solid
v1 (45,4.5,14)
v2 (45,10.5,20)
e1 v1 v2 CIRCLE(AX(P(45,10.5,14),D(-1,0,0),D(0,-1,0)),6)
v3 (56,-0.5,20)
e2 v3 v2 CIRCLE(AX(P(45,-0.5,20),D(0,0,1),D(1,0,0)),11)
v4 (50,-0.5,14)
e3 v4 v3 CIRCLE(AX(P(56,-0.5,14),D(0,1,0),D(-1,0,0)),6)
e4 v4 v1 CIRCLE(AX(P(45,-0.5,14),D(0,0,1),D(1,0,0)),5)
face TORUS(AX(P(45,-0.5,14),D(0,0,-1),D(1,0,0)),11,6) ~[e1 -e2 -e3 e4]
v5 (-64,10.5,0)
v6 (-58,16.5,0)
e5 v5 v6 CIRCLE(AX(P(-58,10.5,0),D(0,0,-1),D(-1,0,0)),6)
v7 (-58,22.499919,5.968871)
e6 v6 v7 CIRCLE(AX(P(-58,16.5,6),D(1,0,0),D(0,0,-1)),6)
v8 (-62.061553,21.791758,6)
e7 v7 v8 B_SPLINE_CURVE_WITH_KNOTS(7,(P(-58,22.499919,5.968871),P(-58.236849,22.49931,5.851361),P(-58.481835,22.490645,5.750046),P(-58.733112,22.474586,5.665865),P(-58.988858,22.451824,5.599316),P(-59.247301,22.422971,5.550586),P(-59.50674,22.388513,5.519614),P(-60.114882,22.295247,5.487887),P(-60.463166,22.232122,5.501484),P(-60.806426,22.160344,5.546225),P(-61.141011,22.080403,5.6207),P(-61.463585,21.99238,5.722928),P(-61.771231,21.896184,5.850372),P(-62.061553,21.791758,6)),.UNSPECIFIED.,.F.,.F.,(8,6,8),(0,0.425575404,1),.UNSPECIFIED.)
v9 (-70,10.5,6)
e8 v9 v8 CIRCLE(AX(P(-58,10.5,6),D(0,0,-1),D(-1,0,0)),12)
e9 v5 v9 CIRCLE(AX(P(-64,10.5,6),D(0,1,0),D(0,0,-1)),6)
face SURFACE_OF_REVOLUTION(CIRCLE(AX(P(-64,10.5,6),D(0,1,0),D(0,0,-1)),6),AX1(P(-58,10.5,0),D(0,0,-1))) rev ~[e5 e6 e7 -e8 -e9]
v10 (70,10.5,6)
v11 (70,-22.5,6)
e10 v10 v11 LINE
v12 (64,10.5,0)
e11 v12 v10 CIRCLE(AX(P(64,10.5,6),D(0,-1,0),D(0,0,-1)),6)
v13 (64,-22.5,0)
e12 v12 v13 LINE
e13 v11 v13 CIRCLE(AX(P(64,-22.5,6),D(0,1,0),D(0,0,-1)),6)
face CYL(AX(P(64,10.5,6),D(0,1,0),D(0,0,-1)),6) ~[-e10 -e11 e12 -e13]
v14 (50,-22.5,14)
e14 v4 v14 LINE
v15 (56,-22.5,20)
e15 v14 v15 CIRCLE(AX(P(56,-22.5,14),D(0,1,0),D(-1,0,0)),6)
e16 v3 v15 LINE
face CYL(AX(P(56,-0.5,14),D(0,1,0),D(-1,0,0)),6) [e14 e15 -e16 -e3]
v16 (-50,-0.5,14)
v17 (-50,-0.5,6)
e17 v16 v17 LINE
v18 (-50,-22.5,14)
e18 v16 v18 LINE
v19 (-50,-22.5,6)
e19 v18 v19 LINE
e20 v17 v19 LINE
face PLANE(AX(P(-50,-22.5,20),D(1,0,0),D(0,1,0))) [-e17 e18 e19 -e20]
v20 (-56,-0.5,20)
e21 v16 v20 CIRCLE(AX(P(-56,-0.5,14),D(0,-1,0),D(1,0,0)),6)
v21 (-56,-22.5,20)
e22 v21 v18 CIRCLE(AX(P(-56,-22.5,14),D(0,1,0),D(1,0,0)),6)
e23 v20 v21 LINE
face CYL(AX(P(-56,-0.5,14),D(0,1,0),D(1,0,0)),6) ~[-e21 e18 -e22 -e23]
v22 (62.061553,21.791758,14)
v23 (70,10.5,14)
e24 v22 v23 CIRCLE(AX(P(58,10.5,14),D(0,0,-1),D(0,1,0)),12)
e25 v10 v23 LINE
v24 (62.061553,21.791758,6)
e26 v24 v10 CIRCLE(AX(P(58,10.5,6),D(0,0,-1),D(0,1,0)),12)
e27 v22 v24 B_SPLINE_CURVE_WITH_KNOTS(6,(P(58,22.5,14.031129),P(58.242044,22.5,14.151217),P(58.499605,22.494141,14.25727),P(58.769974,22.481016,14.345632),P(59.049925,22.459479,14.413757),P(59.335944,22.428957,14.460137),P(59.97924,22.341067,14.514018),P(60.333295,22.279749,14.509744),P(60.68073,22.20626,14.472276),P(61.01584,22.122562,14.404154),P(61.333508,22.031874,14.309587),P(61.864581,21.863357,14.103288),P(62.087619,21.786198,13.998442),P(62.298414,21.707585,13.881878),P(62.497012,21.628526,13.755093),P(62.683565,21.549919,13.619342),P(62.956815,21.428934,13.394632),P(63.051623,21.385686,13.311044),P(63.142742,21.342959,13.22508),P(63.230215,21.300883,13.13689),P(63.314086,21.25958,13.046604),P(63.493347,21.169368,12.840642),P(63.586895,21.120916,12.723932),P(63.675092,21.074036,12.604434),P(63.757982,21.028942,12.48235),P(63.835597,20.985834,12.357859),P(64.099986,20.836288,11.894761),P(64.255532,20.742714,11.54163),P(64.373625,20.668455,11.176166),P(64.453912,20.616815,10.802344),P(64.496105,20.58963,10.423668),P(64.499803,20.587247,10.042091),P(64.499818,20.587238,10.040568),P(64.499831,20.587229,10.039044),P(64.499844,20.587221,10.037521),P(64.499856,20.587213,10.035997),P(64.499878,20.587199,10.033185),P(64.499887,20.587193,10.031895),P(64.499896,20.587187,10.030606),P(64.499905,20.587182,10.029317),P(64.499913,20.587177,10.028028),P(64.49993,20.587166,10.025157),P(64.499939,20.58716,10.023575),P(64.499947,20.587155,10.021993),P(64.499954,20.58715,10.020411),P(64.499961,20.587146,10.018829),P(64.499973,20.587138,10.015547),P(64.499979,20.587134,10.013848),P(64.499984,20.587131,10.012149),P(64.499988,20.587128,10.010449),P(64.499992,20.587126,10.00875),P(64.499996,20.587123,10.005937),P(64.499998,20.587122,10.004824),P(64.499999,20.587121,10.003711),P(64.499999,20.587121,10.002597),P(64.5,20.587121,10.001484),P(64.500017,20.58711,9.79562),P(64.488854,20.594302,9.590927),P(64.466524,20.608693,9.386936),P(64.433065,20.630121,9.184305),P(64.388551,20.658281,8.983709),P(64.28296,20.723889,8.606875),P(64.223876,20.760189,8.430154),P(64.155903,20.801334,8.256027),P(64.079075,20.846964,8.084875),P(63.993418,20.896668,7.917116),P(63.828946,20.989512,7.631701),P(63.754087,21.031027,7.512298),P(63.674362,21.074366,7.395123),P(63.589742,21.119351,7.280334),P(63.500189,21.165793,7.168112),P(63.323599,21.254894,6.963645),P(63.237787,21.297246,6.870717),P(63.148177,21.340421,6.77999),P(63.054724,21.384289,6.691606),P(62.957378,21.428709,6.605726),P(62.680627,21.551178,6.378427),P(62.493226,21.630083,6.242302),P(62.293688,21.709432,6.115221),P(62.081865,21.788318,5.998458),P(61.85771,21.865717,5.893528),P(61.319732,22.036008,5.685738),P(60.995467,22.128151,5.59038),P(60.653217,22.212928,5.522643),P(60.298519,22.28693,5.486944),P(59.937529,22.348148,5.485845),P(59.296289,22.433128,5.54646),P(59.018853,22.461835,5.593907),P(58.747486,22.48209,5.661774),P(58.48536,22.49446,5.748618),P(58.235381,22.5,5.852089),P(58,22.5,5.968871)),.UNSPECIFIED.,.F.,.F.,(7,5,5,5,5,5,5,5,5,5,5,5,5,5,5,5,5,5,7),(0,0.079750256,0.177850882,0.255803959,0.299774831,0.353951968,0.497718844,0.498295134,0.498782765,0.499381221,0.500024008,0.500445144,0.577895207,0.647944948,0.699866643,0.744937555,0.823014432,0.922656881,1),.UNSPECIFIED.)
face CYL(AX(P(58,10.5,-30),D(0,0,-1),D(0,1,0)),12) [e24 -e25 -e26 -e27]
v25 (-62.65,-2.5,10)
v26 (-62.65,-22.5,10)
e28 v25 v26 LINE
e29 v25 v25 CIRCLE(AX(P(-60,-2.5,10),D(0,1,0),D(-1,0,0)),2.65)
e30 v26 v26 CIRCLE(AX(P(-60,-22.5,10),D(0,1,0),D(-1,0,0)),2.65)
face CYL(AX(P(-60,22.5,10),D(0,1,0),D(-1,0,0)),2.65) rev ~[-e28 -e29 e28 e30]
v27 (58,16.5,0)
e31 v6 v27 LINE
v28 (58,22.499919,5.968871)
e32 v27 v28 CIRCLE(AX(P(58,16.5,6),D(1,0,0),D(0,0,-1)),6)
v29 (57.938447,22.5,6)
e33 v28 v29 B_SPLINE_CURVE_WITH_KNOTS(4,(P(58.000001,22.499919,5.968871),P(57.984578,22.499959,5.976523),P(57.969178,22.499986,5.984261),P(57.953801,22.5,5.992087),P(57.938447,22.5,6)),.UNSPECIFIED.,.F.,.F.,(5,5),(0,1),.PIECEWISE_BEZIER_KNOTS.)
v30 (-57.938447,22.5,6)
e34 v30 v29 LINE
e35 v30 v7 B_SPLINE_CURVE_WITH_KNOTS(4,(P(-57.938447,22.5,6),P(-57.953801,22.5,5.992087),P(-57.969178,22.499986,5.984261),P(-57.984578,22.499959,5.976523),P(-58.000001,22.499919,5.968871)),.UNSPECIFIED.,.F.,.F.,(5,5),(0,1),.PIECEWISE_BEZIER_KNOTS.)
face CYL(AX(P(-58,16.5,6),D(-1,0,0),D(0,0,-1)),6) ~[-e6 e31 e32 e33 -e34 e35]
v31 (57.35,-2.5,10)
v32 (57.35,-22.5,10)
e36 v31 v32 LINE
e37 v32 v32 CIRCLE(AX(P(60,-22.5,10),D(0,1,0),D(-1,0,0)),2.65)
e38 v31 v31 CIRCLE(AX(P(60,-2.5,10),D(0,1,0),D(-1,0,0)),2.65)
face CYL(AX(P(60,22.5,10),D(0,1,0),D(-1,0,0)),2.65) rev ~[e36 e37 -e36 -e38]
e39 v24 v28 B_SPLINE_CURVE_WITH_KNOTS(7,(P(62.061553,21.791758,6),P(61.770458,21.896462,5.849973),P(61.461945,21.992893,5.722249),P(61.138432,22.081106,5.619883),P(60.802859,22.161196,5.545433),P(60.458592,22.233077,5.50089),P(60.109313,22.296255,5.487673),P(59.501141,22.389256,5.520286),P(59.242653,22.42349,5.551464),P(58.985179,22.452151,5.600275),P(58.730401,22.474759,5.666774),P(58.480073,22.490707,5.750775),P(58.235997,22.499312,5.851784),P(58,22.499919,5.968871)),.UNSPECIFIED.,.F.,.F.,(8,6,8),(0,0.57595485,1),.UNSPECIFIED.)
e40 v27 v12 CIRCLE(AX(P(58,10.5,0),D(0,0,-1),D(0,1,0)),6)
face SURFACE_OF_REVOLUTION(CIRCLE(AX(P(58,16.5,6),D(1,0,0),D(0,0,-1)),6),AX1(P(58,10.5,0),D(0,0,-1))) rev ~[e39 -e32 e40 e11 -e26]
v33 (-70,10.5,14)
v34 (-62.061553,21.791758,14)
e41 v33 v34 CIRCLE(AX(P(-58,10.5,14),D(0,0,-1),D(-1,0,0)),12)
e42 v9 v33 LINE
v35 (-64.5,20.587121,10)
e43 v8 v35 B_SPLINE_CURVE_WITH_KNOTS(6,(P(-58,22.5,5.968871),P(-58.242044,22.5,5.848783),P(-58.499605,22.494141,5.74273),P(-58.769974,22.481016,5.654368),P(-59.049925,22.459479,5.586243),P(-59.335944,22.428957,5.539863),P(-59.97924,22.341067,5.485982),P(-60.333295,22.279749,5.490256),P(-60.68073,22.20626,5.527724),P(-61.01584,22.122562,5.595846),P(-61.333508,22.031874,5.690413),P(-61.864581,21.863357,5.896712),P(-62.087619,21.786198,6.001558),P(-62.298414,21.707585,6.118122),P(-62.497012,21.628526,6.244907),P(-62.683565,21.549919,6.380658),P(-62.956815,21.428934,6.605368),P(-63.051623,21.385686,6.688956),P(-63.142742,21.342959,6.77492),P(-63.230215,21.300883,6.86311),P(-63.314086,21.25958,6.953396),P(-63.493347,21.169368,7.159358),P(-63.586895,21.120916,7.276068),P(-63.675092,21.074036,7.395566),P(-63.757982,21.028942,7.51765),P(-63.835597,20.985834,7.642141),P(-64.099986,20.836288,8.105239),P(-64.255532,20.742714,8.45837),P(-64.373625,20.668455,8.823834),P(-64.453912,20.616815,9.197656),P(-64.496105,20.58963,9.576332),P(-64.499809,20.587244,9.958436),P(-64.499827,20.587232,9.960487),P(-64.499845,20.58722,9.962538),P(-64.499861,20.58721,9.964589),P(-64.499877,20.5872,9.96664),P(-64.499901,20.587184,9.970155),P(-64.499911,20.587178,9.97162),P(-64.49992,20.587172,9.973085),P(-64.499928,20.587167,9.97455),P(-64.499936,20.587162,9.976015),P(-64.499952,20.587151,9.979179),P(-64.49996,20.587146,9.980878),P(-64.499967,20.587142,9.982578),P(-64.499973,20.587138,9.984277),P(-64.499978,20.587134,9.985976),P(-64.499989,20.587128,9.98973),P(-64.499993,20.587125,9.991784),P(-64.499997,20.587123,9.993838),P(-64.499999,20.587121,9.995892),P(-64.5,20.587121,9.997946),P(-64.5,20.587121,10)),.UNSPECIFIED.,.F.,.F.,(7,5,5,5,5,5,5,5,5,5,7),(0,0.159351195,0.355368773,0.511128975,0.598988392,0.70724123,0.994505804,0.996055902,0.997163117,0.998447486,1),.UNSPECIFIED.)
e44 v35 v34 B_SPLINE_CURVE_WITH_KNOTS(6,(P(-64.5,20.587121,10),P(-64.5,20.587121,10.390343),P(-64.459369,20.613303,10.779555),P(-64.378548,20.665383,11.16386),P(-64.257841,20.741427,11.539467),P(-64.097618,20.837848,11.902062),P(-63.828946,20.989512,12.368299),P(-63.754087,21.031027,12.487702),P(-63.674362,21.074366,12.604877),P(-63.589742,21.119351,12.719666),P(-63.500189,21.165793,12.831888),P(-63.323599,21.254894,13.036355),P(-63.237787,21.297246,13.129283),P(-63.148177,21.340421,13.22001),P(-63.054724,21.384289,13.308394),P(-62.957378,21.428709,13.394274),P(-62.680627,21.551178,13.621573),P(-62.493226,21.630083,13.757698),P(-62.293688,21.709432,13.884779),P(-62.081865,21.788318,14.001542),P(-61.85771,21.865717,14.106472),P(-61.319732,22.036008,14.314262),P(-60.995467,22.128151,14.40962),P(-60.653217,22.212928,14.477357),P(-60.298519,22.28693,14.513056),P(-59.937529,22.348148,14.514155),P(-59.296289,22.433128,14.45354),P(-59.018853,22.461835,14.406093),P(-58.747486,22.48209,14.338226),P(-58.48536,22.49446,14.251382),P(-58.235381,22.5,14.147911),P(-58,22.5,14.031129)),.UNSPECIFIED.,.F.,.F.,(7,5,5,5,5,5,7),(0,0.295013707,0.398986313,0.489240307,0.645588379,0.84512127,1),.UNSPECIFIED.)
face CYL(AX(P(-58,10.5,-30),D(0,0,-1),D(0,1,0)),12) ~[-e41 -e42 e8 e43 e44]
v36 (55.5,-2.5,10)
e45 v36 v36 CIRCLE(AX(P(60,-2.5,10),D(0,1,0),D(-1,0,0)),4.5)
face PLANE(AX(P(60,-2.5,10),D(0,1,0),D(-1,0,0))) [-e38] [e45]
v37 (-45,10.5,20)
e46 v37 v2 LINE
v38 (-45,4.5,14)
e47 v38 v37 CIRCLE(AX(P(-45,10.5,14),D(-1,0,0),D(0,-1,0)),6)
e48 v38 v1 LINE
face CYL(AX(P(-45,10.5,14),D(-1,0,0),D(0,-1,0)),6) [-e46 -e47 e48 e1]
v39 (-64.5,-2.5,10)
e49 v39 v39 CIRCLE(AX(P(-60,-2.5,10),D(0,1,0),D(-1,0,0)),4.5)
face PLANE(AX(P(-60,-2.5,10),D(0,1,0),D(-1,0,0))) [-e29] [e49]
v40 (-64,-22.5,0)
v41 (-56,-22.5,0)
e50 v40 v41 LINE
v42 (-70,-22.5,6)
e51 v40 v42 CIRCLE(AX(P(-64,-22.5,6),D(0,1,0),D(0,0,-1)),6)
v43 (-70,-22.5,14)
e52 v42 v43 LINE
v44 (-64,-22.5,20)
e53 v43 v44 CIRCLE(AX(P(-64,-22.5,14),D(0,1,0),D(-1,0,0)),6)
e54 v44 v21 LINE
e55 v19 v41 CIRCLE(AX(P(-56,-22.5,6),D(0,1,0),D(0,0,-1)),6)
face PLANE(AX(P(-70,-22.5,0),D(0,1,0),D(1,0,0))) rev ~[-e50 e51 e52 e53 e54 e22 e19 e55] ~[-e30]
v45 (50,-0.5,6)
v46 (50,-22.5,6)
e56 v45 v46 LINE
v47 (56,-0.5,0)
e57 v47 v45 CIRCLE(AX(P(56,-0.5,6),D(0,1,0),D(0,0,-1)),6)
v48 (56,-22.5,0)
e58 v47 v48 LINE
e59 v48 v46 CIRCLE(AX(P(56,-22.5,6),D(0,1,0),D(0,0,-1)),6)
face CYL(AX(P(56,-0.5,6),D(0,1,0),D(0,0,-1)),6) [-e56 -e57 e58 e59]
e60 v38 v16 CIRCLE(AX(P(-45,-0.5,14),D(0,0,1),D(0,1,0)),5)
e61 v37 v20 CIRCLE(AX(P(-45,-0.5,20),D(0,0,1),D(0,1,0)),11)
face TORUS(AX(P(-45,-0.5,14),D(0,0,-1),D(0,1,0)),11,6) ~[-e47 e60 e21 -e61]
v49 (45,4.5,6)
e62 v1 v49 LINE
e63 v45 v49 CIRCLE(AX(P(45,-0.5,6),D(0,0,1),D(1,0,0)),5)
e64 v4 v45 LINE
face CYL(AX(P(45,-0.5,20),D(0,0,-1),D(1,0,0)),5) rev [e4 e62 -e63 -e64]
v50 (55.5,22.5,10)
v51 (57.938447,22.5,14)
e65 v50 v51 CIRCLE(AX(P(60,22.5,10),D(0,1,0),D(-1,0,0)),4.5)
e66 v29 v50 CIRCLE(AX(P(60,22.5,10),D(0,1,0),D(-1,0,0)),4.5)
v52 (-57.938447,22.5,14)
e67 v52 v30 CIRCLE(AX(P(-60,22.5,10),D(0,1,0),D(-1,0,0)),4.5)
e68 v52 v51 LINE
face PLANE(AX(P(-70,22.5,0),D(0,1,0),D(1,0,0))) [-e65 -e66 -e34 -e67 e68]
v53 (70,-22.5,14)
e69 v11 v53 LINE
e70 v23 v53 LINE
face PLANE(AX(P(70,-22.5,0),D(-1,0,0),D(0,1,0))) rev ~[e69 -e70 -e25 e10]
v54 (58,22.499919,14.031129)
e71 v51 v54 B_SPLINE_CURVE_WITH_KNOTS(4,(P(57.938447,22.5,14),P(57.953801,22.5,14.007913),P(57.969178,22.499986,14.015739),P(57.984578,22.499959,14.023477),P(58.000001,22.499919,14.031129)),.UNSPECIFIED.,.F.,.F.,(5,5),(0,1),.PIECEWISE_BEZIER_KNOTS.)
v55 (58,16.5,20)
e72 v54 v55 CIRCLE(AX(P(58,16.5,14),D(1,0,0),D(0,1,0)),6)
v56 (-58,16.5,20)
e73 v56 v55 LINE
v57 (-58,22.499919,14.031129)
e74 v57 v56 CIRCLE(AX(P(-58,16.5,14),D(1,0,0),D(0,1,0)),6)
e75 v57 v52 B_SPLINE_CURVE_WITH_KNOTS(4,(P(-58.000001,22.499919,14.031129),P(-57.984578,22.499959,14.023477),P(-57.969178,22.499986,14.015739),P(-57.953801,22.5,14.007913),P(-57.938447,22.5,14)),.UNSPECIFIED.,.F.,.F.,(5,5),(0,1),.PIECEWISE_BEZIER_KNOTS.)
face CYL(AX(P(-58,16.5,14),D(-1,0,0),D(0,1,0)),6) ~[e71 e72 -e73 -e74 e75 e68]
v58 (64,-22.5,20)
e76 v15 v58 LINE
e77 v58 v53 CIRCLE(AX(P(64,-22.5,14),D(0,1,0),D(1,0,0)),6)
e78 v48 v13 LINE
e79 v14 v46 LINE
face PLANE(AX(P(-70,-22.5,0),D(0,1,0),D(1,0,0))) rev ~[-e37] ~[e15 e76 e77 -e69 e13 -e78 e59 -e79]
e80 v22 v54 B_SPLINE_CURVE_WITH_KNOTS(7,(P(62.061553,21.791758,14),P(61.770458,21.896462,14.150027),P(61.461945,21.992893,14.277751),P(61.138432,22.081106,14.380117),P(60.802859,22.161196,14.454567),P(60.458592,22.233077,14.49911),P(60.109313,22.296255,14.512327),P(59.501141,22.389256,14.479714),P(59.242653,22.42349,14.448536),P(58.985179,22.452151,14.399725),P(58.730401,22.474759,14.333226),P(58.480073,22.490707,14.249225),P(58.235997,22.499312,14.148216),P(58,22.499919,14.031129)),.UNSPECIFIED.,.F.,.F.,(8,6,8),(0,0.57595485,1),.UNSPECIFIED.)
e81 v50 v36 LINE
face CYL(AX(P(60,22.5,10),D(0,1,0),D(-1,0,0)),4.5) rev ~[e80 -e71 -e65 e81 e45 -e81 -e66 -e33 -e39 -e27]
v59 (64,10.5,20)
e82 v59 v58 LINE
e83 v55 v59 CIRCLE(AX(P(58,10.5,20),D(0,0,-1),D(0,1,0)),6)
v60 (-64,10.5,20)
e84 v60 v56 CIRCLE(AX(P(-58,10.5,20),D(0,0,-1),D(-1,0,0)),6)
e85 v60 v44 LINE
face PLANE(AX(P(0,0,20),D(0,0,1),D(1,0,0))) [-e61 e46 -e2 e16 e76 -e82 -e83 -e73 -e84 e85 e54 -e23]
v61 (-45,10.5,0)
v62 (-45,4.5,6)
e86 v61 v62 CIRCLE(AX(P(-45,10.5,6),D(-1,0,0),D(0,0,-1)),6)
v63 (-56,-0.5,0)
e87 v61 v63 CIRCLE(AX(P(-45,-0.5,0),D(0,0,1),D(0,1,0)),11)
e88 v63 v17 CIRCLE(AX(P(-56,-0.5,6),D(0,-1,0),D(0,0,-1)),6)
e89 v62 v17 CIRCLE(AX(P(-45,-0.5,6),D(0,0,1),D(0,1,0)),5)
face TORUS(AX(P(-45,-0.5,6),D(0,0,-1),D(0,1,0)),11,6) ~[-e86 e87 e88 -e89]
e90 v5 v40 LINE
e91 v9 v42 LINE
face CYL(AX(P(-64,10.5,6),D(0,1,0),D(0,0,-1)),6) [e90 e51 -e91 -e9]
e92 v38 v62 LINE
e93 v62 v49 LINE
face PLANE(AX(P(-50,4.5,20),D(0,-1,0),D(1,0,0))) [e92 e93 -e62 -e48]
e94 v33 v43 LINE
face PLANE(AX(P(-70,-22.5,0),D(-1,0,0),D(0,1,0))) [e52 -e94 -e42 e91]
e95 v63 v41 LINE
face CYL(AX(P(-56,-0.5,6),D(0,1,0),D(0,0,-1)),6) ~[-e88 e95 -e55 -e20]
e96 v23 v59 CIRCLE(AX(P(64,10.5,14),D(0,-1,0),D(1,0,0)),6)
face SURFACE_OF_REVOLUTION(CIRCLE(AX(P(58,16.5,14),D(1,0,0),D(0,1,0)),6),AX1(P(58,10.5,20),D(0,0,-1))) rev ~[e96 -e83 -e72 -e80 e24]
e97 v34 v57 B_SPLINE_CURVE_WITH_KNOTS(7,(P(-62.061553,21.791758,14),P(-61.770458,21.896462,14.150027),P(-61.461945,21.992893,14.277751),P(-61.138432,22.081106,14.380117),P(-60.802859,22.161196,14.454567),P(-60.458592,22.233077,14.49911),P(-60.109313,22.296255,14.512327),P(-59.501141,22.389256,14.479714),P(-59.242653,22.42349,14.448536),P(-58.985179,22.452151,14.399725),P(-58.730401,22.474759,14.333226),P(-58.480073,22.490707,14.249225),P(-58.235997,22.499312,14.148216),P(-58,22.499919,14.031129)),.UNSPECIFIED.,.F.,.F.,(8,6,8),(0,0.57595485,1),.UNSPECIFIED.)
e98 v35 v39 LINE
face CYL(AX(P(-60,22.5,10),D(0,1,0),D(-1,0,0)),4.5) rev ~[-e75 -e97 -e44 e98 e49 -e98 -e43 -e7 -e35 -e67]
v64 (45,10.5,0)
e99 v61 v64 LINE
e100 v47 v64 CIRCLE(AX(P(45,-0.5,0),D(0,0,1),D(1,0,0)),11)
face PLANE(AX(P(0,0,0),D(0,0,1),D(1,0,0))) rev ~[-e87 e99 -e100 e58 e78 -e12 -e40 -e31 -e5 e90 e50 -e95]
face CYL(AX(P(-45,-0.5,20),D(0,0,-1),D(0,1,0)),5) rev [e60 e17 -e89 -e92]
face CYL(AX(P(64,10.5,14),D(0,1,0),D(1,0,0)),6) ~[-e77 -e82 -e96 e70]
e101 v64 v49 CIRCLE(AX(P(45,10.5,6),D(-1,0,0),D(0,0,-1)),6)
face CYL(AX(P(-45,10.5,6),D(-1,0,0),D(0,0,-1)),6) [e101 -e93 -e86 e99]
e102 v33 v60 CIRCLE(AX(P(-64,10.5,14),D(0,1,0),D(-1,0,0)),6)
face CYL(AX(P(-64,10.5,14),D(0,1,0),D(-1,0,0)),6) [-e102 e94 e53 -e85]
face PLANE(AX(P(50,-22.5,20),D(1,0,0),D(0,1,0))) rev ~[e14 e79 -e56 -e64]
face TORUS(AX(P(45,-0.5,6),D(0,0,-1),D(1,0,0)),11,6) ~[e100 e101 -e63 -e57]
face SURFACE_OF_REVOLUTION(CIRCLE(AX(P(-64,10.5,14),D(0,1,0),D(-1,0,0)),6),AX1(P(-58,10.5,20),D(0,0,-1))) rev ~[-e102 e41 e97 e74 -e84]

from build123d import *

# Parameters (mm, degrees)
F0_W          = 140
F0_H          = 45
F1_DEPTH      = 20
F2_W          = 100
F2_H          = 27
F3_DEPTH      = 25
F4_R          = 2.65
F5_DEPTH      = 45.001
F6_R          = 4.5
F7_DEPTH      = 25
F8_T1_DEPTH   = 80
F9_R          = 5
F10_T1_DEPTH  = 116
F10_T3_DEPTH  = 90
F10_T5_DEPTH  = 37
F10_T7_DEPTH  = 48
F10_T10_ANGLE = 90
F10_T12_ANGLE = 90
F10_T14_ANGLE = 89.9999999987
F10_T16_ANGLE = 89.9999999987
F10_T18_ANGLE = 90
F10_T20_ANGLE = 90
F10_T22_ANGLE = 89.9999999987
F10_T24_ANGLE = 89.9999999987


# Not quite as in the source:
# - a fillet or chamfer that OpenCascade refuses, or shapes differently, is made with other operations: its cross-section is extruded or revolved along the edge and cut away or added


with BuildPart() as f1:
    # F0 (on Top) → F1 (new body)
    with BuildSketch(Plane.XY):
        Rectangle(F0_W, F0_H)
    extrude(amount=F1_DEPTH)

    # F2 (on face) → F3 (cut)
    with BuildSketch(Plane.XY.offset(20)):
        with Locations((0, -9)):
            Rectangle(F2_W, F2_H)
    extrude(amount=-F3_DEPTH, mode=Mode.SUBTRACT)

    # F4 (on face) → F5 (cut, through all)
    with BuildSketch(Plane(origin=(0, 22.5, 0), x_dir=(-1, 0, 0), z_dir=(0, 1, 0))):
        with Locations((60, 10)):
            Circle(F4_R)
        with Locations((-60, 10)):
            Circle(F4_R)
    extrude(amount=-F5_DEPTH, mode=Mode.SUBTRACT)

    # F6 (on face) → F7 (cut)
    with BuildSketch(Plane(origin=(0, 22.5, 0), x_dir=(-1, 0, 0), z_dir=(0, 1, 0))):
        with Locations((60, 10)):
            Circle(F6_R)
        with Locations((-60, 10)):
            Circle(F6_R)
    extrude(amount=-F7_DEPTH, mode=Mode.SUBTRACT)

    # F8: fillet of radius 12 on 2 edges, made by hand

    # F8_s2 → F8_t1 (cut)
    with BuildSketch(Plane.XY.offset(-30)):
        with BuildLine():
            ThreePointArc((-58, 22.5), (-66.4852813742, 18.9852813742), (-70, 10.5))
            Line((-70, 10.5), (-70, 22.5))
            Line((-70, 22.5), (-58, 22.5))
        make_face()
        with BuildLine():
            ThreePointArc((58, 22.5), (66.4852813742, 18.9852813742), (70, 10.5))
            Line((70, 10.5), (70, 22.5))
            Line((70, 22.5), (58, 22.5))
        make_face()
    extrude(amount=F8_T1_DEPTH, mode=Mode.SUBTRACT)

    # F9
    f9_edges = [f1.edges().sort_by_distance(p)[0] for p in [
        (-50, 4.5, 10),
        (50, 4.5, 10),
    ]]
    fillet(f9_edges, radius=F9_R)

    # F10: fillet of radius 6 on 20 edges, made by hand

    # F10_s2 → F10_t1 (cut)
    with BuildSketch(Plane.YZ.offset(-58)):
        with BuildLine():
            ThreePointArc((22.5, 14), (20.7426406871, 18.2426406871), (16.5, 20))
            Line((16.5, 20), (22.5, 20))
            Line((22.5, 20), (22.5, 14))
        make_face()
        with BuildLine():
            ThreePointArc((16.5, 0), (20.7426406871, 1.7573593129), (22.5, 6))
            Line((22.5, 6), (22.5, 0))
            Line((22.5, 0), (16.5, 0))
        make_face()
    extrude(amount=F10_T1_DEPTH, mode=Mode.SUBTRACT)

    # F10_s4 → F10_t3 (cut)
    with BuildSketch(Plane.YZ.offset(-45)):
        with BuildLine():
            ThreePointArc((4.5, 14), (6.2573593129, 18.2426406871), (10.5, 20))
            Line((10.5, 20), (4.5, 20))
            Line((4.5, 20), (4.5, 14))
        make_face()
        with BuildLine():
            ThreePointArc((10.5, 0), (6.2573593129, 1.7573593129), (4.5, 6))
            Line((4.5, 6), (4.5, 0))
            Line((4.5, 0), (10.5, 0))
        make_face()
    extrude(amount=F10_T3_DEPTH, mode=Mode.SUBTRACT)

    # F10_s6 → F10_t5 (cut)
    with BuildSketch(Plane.XZ.offset(0.5)):
        with BuildLine():
            ThreePointArc((56, 0), (51.7573593129, 1.7573593129), (50, 6))
            Line((50, 6), (50, 0))
            Line((50, 0), (56, 0))
        make_face()
        with BuildLine():
            ThreePointArc((-56, 0), (-51.7573593129, 1.7573593129), (-50, 6))
            Line((-50, 6), (-50, 0))
            Line((-50, 0), (-56, 0))
        make_face()
        with BuildLine():
            ThreePointArc((50, 14), (51.7573593129, 18.2426406871), (56, 20))
            Line((56, 20), (50, 20))
            Line((50, 20), (50, 14))
        make_face()
        with BuildLine():
            ThreePointArc((-50, 14), (-51.7573593129, 18.2426406871), (-56, 20))
            Line((-56, 20), (-50, 20))
            Line((-50, 20), (-50, 14))
        make_face()
    extrude(amount=F10_T5_DEPTH, mode=Mode.SUBTRACT)

    # F10_s8 → F10_t7 (cut)
    with BuildSketch(Plane.XZ.offset(-10.5)):
        with BuildLine():
            ThreePointArc((64, 0), (68.2426406871, 1.7573593129), (70, 6))
            Line((70, 6), (70, 0))
            Line((70, 0), (64, 0))
        make_face()
        with BuildLine():
            ThreePointArc((-64, 0), (-68.2426406871, 1.7573593129), (-70, 6))
            Line((-70, 6), (-70, 0))
            Line((-70, 0), (-64, 0))
        make_face()
        with BuildLine():
            ThreePointArc((70, 14), (68.2426406871, 18.2426406871), (64, 20))
            Line((64, 20), (70, 20))
            Line((70, 20), (70, 14))
        make_face()
        with BuildLine():
            ThreePointArc((-70, 14), (-68.2426406871, 18.2426406871), (-64, 20))
            Line((-64, 20), (-70, 20))
            Line((-70, 20), (-70, 14))
        make_face()
    extrude(amount=F10_T7_DEPTH, mode=Mode.SUBTRACT)

    # F10_s9 → F10_t10 (revolve, cut)
    with BuildSketch(Plane.XZ.offset(0.5)):
        with BuildLine():
            ThreePointArc((56, 0), (51.7573593129, 1.7573593129), (50, 6))
            Line((50, 6), (50, 0))
            Line((50, 0), (56, 0))
        make_face()
    revolve(axis=Axis((45, -0.5, 0), (0, 0, 1)), revolution_arc=F10_T10_ANGLE, mode=Mode.SUBTRACT)

    # F10_s11 → F10_t12 (revolve, cut)
    with BuildSketch(Plane.YZ.offset(-45)):
        with BuildLine():
            ThreePointArc((10.5, 0), (6.2573593129, 1.7573593129), (4.5, 6))
            Line((4.5, 6), (4.5, 0))
            Line((4.5, 0), (10.5, 0))
        make_face()
    revolve(axis=Axis((-45, -0.5, 0), (0, 0, 1)), revolution_arc=F10_T12_ANGLE, mode=Mode.SUBTRACT)

    # F10_s13 → F10_t14 (revolve, cut)
    with BuildSketch(Plane.YZ.offset(57.9999999999)):
        with BuildLine():
            ThreePointArc((16.5, 0), (20.7426406871, 1.7573593129), (22.5, 6))
            Line((22.5, 6), (22.5, 0))
            Line((22.5, 0), (16.5, 0))
        make_face()
    revolve(axis=Axis((57.9999999999, 10.4999999999, 0), (0, 0, -1)), revolution_arc=F10_T14_ANGLE, mode=Mode.SUBTRACT)

    # F10_s15 → F10_t16 (revolve, cut)
    with BuildSketch(Plane.XZ.offset(-10.4999999999)):
        with BuildLine():
            ThreePointArc((-64, 0), (-68.2426406871, 1.7573593129), (-70, 6))
            Line((-70, 6), (-70, 0))
            Line((-70, 0), (-64, 0))
        make_face()
    revolve(axis=Axis((-57.9999999999, 10.4999999999, 0), (0, 0, -1)), revolution_arc=F10_T16_ANGLE, mode=Mode.SUBTRACT)

    # F10_s17 → F10_t18 (revolve, cut)
    with BuildSketch(Plane.XZ.offset(0.5)):
        with BuildLine():
            ThreePointArc((50, 14), (51.7573593129, 18.2426406871), (56, 20))
            Line((56, 20), (50, 20))
            Line((50, 20), (50, 14))
        make_face()
    revolve(axis=Axis((45, -0.5, 20), (0, 0, 1)), revolution_arc=F10_T18_ANGLE, mode=Mode.SUBTRACT)

    # F10_s19 → F10_t20 (revolve, cut)
    with BuildSketch(Plane.YZ.offset(-45)):
        with BuildLine():
            ThreePointArc((4.5, 14), (6.2573593129, 18.2426406871), (10.5, 20))
            Line((10.5, 20), (4.5, 20))
            Line((4.5, 20), (4.5, 14))
        make_face()
    revolve(axis=Axis((-45, -0.5, 20), (0, 0, 1)), revolution_arc=F10_T20_ANGLE, mode=Mode.SUBTRACT)

    # F10_s21 → F10_t22 (revolve, cut)
    with BuildSketch(Plane.YZ.offset(57.9999999999)):
        with BuildLine():
            ThreePointArc((22.5, 14), (20.7426406871, 18.2426406871), (16.5, 20))
            Line((16.5, 20), (22.5, 20))
            Line((22.5, 20), (22.5, 14))
        make_face()
    revolve(axis=Axis((57.9999999999, 10.4999999999, 20), (0, 0, -1)), revolution_arc=F10_T22_ANGLE, mode=Mode.SUBTRACT)

    # F10_s23 → F10_t24 (revolve, cut)
    with BuildSketch(Plane.XZ.offset(-10.4999999999)):
        with BuildLine():
            ThreePointArc((-70, 14), (-68.2426406871, 18.2426406871), (-64, 20))
            Line((-64, 20), (-70, 20))
            Line((-70, 20), (-70, 14))
        make_face()
    revolve(axis=Axis((-57.9999999999, 10.4999999999, 20), (0, 0, -1)), revolution_arc=F10_T24_ANGLE, mode=Mode.SUBTRACT)


solid = f1.part
